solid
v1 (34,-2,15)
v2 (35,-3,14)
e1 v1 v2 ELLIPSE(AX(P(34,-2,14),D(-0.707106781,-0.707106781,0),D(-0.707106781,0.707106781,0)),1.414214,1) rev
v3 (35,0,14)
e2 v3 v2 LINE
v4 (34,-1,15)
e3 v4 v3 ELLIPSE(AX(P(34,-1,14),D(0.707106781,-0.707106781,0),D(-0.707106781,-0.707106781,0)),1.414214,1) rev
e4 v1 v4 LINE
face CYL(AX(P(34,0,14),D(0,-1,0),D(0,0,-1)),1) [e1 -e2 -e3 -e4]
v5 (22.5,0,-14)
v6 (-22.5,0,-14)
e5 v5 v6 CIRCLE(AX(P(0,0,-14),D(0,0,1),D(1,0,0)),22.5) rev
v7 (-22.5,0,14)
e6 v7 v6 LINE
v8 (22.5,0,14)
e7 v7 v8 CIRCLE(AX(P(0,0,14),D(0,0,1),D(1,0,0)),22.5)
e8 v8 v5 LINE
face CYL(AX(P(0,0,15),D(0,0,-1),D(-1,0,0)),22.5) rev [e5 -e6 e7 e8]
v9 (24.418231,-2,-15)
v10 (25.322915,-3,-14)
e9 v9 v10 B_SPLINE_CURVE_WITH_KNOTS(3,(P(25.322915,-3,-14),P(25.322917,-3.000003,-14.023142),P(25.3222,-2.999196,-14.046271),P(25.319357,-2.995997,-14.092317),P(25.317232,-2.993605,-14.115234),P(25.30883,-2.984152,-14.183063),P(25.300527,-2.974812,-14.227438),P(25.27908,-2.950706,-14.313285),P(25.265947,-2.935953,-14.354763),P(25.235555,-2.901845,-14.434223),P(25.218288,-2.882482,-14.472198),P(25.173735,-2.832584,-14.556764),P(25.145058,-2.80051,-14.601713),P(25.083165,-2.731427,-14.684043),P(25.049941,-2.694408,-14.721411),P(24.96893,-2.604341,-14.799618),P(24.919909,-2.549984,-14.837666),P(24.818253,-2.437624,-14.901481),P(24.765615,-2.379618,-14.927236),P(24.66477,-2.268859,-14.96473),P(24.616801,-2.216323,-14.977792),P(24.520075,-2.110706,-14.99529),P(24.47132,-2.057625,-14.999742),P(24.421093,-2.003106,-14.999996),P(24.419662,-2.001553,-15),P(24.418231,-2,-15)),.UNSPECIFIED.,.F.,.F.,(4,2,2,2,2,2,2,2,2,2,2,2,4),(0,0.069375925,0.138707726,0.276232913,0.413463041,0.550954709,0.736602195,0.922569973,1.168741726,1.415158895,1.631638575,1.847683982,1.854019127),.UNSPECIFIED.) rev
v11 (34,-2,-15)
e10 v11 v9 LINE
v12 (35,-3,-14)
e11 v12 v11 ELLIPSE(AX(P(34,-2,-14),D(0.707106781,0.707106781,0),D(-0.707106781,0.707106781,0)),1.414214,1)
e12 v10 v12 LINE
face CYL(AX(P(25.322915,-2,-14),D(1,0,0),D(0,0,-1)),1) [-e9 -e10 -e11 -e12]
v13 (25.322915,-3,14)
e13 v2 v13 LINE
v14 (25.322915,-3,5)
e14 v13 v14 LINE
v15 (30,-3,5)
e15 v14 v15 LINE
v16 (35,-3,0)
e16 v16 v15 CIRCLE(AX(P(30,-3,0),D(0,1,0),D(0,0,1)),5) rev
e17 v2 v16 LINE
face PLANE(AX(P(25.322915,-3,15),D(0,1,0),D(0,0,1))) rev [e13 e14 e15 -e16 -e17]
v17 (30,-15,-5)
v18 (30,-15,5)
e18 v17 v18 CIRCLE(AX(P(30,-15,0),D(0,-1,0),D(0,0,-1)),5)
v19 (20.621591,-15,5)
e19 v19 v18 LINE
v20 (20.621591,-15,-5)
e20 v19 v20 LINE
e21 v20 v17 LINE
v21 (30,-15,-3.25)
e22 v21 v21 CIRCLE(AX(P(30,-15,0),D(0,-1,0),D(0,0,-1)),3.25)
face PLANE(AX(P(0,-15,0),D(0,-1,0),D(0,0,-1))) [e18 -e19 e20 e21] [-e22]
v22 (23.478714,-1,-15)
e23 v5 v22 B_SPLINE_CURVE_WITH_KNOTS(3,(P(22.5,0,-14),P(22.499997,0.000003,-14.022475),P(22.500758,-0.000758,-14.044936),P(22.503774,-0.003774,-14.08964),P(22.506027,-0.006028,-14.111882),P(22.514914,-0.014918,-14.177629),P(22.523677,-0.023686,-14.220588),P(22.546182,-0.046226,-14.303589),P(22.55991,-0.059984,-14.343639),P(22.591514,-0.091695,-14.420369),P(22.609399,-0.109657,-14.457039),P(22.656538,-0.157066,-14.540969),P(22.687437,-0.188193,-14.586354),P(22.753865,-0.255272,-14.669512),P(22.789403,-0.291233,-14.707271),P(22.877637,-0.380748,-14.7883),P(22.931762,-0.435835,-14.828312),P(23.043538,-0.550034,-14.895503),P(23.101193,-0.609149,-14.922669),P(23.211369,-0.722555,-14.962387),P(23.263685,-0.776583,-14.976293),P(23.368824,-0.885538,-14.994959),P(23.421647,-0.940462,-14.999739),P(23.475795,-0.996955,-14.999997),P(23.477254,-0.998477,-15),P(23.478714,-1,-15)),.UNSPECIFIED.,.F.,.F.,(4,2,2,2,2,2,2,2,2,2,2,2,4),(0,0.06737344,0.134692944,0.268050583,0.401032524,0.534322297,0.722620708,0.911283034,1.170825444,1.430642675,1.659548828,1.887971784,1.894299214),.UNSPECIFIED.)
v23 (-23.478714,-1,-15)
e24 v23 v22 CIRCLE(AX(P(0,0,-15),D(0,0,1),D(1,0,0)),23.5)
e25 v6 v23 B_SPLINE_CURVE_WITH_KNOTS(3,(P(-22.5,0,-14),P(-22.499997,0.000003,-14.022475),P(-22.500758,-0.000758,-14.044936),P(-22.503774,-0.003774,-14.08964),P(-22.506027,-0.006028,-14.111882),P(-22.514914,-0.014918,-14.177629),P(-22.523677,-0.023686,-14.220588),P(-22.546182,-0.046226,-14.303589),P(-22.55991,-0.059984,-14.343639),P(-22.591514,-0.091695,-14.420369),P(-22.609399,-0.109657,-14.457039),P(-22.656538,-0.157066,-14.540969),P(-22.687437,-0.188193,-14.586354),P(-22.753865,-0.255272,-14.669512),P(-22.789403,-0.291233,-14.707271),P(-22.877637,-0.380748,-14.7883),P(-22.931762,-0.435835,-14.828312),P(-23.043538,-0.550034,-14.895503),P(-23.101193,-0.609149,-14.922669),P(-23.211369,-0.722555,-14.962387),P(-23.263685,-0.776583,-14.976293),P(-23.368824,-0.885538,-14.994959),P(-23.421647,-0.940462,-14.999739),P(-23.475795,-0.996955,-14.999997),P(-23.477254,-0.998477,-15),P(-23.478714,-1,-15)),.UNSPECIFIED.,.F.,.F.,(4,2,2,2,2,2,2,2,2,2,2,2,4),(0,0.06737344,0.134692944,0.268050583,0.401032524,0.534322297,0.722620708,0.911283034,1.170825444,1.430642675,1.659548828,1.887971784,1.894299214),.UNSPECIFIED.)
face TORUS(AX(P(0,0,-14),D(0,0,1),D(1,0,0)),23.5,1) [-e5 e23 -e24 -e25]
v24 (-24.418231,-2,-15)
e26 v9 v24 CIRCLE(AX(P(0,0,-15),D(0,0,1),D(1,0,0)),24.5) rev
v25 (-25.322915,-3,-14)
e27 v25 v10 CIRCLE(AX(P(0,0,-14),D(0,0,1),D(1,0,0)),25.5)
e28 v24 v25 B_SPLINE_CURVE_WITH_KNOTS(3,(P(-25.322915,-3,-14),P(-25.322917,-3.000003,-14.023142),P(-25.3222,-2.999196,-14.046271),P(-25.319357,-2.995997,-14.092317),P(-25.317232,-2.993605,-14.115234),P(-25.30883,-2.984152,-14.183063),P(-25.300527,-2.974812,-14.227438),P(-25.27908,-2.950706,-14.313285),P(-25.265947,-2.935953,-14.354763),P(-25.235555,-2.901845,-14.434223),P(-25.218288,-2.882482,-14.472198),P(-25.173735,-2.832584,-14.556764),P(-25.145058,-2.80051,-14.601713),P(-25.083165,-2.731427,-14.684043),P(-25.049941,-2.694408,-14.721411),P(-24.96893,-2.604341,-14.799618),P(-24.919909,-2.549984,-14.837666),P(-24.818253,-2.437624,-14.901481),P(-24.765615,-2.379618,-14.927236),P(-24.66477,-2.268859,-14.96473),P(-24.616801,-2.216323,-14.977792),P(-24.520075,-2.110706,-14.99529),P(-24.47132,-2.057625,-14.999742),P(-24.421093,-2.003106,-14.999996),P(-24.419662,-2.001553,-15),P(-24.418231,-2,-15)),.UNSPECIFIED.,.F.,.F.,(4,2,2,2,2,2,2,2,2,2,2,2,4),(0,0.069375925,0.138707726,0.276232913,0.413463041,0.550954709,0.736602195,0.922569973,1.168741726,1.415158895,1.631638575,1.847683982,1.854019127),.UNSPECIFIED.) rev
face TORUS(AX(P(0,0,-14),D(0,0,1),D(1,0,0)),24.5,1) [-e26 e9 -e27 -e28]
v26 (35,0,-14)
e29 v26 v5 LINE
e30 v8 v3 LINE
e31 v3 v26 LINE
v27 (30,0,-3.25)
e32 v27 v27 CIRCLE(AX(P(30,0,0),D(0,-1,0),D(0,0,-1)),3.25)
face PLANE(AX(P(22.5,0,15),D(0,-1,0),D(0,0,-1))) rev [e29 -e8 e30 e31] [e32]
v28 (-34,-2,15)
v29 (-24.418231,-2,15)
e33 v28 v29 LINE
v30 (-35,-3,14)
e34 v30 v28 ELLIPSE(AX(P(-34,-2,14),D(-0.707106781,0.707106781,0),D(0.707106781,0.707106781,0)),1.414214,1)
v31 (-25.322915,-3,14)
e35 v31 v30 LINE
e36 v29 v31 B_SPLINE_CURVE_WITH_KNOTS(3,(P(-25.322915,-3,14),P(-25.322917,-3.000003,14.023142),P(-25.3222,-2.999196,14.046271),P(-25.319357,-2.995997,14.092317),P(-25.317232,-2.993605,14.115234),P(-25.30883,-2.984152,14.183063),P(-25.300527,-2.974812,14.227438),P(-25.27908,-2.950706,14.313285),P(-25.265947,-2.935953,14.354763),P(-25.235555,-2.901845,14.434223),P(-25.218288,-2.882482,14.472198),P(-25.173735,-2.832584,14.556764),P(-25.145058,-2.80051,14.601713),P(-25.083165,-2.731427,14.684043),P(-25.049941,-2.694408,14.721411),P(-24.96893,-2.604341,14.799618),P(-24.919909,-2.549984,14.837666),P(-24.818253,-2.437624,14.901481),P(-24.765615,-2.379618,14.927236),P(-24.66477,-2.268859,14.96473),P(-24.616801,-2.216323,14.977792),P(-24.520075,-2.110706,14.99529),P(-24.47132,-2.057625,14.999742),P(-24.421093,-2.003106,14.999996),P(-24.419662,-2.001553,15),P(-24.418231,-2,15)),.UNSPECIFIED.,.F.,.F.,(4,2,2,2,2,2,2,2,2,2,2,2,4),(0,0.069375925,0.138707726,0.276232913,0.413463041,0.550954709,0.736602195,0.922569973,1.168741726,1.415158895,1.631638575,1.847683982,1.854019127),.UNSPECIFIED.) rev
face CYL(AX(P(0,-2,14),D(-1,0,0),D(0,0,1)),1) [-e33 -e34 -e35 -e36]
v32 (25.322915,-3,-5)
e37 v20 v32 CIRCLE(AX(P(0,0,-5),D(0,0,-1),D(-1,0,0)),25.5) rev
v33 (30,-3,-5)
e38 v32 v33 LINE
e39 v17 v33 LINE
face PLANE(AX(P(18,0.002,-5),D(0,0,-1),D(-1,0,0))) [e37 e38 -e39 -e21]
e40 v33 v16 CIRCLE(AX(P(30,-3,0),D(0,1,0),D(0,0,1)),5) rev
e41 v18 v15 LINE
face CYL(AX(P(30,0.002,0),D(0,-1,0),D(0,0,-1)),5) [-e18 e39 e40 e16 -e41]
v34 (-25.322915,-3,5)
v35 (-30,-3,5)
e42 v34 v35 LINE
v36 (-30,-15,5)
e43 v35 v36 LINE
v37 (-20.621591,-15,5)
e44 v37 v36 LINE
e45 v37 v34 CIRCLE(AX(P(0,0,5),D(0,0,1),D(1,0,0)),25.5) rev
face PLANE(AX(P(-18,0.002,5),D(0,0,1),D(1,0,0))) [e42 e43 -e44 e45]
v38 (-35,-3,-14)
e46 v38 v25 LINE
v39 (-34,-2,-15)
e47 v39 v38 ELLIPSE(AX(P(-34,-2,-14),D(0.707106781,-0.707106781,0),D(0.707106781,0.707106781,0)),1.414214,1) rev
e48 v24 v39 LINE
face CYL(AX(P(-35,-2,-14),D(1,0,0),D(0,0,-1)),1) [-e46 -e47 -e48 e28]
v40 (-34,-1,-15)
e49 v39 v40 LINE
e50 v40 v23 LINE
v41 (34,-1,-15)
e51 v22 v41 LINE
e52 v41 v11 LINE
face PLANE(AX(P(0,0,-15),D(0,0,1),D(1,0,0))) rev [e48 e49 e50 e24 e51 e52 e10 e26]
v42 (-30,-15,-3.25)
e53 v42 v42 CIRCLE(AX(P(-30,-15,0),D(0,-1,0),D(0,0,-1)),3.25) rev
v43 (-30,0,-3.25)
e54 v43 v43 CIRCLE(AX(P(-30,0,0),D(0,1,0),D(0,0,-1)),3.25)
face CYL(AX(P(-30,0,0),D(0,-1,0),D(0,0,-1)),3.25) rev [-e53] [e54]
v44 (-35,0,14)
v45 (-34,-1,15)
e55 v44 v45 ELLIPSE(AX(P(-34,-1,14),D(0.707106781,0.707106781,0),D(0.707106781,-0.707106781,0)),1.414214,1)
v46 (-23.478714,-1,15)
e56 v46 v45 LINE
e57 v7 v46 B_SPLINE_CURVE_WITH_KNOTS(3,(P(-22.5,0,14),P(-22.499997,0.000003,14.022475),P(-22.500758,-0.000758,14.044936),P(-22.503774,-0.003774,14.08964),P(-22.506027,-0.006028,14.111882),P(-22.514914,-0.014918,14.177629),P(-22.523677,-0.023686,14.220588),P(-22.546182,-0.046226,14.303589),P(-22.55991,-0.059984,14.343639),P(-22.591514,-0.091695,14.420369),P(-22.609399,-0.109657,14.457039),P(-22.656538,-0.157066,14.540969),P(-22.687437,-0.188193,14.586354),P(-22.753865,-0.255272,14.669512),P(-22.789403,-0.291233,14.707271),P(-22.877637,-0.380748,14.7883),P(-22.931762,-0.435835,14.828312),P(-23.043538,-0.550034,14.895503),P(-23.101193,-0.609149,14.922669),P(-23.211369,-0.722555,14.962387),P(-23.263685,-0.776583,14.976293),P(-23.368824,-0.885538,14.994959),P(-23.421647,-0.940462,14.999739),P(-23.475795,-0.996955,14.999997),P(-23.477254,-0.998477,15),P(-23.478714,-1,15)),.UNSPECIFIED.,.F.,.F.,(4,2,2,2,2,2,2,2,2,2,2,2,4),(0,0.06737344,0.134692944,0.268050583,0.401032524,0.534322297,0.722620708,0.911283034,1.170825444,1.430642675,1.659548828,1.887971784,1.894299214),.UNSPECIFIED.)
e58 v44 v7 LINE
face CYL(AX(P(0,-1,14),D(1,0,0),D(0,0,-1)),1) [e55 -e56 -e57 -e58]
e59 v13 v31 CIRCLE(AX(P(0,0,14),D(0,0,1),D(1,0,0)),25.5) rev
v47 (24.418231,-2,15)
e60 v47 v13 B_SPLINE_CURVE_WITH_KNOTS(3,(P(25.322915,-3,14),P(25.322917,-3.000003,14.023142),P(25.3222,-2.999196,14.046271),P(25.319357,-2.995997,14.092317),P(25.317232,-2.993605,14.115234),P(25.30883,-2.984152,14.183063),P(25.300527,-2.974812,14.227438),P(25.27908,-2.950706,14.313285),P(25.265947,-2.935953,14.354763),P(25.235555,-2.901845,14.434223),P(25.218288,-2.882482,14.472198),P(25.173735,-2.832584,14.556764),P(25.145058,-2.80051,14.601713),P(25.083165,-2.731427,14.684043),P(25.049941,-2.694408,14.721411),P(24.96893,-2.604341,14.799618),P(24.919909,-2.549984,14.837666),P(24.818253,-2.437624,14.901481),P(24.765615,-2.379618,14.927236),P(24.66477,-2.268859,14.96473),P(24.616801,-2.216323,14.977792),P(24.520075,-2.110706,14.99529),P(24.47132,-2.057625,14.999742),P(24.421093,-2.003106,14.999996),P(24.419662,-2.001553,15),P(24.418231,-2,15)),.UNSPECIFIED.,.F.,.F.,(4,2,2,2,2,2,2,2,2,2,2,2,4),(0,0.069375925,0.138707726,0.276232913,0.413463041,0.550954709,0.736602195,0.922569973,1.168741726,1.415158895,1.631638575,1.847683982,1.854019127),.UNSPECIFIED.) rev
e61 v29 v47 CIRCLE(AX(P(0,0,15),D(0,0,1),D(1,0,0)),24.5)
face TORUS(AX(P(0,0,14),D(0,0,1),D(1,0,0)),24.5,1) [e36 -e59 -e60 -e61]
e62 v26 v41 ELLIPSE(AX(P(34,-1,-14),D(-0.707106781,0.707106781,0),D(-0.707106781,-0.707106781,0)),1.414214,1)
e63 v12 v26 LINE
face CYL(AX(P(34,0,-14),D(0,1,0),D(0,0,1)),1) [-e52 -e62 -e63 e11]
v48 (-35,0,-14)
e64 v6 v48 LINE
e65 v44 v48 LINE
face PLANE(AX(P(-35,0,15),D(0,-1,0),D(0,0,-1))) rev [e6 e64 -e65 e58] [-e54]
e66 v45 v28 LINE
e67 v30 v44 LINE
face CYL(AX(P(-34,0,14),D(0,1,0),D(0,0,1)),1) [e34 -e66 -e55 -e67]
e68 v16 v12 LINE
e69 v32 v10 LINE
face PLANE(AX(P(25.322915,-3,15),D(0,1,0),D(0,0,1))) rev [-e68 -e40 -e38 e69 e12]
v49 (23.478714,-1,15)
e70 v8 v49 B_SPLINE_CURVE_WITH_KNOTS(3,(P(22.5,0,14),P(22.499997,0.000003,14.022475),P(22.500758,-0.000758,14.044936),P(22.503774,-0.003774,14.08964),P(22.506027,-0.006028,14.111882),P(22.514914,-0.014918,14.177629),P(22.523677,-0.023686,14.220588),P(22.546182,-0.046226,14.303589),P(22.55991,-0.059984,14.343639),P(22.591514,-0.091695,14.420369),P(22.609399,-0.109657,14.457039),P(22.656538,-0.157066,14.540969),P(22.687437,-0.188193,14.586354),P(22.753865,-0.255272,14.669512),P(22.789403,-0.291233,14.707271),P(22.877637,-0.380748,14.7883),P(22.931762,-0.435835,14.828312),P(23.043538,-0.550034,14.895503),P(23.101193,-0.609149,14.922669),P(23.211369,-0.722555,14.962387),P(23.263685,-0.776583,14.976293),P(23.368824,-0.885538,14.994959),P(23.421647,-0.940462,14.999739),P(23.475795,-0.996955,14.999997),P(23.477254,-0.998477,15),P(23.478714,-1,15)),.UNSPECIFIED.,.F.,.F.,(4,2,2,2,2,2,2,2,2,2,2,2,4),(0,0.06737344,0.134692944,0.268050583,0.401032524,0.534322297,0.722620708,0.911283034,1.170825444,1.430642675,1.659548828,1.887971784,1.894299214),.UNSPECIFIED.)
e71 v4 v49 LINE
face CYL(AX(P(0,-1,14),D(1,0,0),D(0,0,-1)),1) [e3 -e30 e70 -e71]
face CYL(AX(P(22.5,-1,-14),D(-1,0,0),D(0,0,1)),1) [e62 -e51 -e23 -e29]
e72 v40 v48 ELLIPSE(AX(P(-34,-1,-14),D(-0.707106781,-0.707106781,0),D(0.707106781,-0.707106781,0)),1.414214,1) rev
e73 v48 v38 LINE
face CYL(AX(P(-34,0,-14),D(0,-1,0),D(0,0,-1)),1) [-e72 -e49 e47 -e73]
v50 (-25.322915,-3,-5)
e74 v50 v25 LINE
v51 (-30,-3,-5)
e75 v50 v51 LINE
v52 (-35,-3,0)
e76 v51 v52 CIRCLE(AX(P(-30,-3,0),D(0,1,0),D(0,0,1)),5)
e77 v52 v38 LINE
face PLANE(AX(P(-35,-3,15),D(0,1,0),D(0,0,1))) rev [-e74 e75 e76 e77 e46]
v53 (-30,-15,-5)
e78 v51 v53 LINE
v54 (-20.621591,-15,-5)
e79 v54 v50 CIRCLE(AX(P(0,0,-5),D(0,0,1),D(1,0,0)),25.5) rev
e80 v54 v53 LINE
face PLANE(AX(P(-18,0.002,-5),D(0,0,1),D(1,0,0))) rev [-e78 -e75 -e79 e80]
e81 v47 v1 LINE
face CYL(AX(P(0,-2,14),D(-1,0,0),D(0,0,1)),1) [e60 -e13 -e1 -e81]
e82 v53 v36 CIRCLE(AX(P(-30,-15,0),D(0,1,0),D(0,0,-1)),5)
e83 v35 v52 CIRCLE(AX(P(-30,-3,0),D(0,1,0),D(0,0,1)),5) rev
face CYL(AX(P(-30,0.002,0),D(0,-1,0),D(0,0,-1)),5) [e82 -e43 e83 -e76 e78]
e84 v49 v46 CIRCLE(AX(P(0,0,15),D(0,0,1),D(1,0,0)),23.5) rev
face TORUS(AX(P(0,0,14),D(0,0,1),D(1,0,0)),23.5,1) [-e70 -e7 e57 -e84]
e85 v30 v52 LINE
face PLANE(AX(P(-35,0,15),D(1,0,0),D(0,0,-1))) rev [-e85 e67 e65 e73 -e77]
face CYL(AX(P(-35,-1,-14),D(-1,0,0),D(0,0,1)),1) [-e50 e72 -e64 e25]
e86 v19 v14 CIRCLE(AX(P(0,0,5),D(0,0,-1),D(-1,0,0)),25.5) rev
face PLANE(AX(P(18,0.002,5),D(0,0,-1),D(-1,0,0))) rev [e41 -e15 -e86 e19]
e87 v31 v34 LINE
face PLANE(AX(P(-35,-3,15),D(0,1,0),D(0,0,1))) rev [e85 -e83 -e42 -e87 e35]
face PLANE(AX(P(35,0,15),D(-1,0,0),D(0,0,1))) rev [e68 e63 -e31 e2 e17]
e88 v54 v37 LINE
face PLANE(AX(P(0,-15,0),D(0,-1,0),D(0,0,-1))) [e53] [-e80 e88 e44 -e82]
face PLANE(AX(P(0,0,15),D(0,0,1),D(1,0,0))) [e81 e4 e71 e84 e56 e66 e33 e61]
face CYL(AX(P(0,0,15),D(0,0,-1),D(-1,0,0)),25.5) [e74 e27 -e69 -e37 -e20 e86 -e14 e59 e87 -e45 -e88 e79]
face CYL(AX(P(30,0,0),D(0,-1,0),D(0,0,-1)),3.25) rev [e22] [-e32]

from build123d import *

# Parameters (mm, degrees)
BOSS_EXTRUDE1_DEPTH = 15
BOSS_EXTRUDE2_REACH = 58.23
BOSS_EXTRUDE2_START = 12
SKETCH2_3_R         = 3.25
CUT_EXTRUDE1_DEPTH  = 45.229515032
FILLET1_R           = 1


with BuildPart() as part:
    # Sketch1 → Boss-Extrude1 (new, symmetric)
    with BuildSketch(Plane.XY):
        with BuildLine():
            Line((-35, 0), (-22.5, 0))
            ThreePointArc((-22.5, 0), (0, -22.5), (22.5, 0))
            Line((22.5, 0), (35, 0))
            Line((35, 0), (35, -3))
            Line((35, -3), (25.322914524, -3))
            ThreePointArc((25.322914524, -3), (0, -25.5), (-25.322914524, -3))
            Line((-25.322914524, -3), (-35, -3))
            Line((-35, -3), (-35, 0))
        make_face()
    extrude(amount=BOSS_EXTRUDE1_DEPTH, both=True)

    # Sketch2 → Boss-Extrude2 (add, up to next)
    with BuildSketch(Plane.XZ.offset(3).offset(BOSS_EXTRUDE2_START), mode=Mode.PRIVATE) as boss_extrude2_sk1:
        with BuildLine():
            Line((18, 5), (18, -5))
            Line((18, -5), (30, -5))
            ThreePointArc((30, -5), (35, 0), (30, 5))
            Line((30, 5), (18, 5))
        make_face()
    boss_extrude2_tool1 = extrude(boss_extrude2_sk1.sketch, amount=-BOSS_EXTRUDE2_REACH, mode=Mode.PRIVATE) - part.part
    boss_extrude2 = boss_extrude2_tool1.solids().sort_by_distance((26.002593, -15, 0))[0]
    add(boss_extrude2)

    # Sketch2<3> → Cut-Extrude1 (cut, symmetric)
    with BuildSketch(Plane.XZ.offset(3)):
        with Locations((30, 0)):
            Circle(SKETCH2_3_R)
    cut_extrude1 = extrude(amount=CUT_EXTRUDE1_DEPTH, both=True, mode=Mode.SUBTRACT)

    # Mirror1: Boss-Extrude2, Cut-Extrude1 across plane
    add(boss_extrude2.mirror(Plane(origin=(0, 0, 0), x_dir=(0, 0, 1), z_dir=(1, 0, 0))))
    add(cut_extrude1.mirror(Plane(origin=(0, 0, 0), x_dir=(0, 0, 1), z_dir=(1, 0, 0))), mode=Mode.SUBTRACT)

    # Fillet1
    fillet1_edges = [part.edges().sort_by_distance(p)[0] for p in [
        (28.75, 0, 15),
        (35, -1.5, 15),
        (30.161457262, -3, 15),
        (0, -25.5, 15),
        (-30.161457262, -3, 15),
        (-35, -1.5, 15),
        (-28.75, 0, 15),
        (0, -22.5, 15),
        (-28.75, 0, -15),
        (-35, -1.5, -15),
        (-30.161457262, -3, -15),
        (0, -25.5, -15),
        (30.161457262, -3, -15),
        (35, -1.5, -15),
        (28.75, 0, -15),
        (0, -22.5, -15),
    ]]
    fillet(fillet1_edges, radius=FILLET1_R)


solid = part.part
